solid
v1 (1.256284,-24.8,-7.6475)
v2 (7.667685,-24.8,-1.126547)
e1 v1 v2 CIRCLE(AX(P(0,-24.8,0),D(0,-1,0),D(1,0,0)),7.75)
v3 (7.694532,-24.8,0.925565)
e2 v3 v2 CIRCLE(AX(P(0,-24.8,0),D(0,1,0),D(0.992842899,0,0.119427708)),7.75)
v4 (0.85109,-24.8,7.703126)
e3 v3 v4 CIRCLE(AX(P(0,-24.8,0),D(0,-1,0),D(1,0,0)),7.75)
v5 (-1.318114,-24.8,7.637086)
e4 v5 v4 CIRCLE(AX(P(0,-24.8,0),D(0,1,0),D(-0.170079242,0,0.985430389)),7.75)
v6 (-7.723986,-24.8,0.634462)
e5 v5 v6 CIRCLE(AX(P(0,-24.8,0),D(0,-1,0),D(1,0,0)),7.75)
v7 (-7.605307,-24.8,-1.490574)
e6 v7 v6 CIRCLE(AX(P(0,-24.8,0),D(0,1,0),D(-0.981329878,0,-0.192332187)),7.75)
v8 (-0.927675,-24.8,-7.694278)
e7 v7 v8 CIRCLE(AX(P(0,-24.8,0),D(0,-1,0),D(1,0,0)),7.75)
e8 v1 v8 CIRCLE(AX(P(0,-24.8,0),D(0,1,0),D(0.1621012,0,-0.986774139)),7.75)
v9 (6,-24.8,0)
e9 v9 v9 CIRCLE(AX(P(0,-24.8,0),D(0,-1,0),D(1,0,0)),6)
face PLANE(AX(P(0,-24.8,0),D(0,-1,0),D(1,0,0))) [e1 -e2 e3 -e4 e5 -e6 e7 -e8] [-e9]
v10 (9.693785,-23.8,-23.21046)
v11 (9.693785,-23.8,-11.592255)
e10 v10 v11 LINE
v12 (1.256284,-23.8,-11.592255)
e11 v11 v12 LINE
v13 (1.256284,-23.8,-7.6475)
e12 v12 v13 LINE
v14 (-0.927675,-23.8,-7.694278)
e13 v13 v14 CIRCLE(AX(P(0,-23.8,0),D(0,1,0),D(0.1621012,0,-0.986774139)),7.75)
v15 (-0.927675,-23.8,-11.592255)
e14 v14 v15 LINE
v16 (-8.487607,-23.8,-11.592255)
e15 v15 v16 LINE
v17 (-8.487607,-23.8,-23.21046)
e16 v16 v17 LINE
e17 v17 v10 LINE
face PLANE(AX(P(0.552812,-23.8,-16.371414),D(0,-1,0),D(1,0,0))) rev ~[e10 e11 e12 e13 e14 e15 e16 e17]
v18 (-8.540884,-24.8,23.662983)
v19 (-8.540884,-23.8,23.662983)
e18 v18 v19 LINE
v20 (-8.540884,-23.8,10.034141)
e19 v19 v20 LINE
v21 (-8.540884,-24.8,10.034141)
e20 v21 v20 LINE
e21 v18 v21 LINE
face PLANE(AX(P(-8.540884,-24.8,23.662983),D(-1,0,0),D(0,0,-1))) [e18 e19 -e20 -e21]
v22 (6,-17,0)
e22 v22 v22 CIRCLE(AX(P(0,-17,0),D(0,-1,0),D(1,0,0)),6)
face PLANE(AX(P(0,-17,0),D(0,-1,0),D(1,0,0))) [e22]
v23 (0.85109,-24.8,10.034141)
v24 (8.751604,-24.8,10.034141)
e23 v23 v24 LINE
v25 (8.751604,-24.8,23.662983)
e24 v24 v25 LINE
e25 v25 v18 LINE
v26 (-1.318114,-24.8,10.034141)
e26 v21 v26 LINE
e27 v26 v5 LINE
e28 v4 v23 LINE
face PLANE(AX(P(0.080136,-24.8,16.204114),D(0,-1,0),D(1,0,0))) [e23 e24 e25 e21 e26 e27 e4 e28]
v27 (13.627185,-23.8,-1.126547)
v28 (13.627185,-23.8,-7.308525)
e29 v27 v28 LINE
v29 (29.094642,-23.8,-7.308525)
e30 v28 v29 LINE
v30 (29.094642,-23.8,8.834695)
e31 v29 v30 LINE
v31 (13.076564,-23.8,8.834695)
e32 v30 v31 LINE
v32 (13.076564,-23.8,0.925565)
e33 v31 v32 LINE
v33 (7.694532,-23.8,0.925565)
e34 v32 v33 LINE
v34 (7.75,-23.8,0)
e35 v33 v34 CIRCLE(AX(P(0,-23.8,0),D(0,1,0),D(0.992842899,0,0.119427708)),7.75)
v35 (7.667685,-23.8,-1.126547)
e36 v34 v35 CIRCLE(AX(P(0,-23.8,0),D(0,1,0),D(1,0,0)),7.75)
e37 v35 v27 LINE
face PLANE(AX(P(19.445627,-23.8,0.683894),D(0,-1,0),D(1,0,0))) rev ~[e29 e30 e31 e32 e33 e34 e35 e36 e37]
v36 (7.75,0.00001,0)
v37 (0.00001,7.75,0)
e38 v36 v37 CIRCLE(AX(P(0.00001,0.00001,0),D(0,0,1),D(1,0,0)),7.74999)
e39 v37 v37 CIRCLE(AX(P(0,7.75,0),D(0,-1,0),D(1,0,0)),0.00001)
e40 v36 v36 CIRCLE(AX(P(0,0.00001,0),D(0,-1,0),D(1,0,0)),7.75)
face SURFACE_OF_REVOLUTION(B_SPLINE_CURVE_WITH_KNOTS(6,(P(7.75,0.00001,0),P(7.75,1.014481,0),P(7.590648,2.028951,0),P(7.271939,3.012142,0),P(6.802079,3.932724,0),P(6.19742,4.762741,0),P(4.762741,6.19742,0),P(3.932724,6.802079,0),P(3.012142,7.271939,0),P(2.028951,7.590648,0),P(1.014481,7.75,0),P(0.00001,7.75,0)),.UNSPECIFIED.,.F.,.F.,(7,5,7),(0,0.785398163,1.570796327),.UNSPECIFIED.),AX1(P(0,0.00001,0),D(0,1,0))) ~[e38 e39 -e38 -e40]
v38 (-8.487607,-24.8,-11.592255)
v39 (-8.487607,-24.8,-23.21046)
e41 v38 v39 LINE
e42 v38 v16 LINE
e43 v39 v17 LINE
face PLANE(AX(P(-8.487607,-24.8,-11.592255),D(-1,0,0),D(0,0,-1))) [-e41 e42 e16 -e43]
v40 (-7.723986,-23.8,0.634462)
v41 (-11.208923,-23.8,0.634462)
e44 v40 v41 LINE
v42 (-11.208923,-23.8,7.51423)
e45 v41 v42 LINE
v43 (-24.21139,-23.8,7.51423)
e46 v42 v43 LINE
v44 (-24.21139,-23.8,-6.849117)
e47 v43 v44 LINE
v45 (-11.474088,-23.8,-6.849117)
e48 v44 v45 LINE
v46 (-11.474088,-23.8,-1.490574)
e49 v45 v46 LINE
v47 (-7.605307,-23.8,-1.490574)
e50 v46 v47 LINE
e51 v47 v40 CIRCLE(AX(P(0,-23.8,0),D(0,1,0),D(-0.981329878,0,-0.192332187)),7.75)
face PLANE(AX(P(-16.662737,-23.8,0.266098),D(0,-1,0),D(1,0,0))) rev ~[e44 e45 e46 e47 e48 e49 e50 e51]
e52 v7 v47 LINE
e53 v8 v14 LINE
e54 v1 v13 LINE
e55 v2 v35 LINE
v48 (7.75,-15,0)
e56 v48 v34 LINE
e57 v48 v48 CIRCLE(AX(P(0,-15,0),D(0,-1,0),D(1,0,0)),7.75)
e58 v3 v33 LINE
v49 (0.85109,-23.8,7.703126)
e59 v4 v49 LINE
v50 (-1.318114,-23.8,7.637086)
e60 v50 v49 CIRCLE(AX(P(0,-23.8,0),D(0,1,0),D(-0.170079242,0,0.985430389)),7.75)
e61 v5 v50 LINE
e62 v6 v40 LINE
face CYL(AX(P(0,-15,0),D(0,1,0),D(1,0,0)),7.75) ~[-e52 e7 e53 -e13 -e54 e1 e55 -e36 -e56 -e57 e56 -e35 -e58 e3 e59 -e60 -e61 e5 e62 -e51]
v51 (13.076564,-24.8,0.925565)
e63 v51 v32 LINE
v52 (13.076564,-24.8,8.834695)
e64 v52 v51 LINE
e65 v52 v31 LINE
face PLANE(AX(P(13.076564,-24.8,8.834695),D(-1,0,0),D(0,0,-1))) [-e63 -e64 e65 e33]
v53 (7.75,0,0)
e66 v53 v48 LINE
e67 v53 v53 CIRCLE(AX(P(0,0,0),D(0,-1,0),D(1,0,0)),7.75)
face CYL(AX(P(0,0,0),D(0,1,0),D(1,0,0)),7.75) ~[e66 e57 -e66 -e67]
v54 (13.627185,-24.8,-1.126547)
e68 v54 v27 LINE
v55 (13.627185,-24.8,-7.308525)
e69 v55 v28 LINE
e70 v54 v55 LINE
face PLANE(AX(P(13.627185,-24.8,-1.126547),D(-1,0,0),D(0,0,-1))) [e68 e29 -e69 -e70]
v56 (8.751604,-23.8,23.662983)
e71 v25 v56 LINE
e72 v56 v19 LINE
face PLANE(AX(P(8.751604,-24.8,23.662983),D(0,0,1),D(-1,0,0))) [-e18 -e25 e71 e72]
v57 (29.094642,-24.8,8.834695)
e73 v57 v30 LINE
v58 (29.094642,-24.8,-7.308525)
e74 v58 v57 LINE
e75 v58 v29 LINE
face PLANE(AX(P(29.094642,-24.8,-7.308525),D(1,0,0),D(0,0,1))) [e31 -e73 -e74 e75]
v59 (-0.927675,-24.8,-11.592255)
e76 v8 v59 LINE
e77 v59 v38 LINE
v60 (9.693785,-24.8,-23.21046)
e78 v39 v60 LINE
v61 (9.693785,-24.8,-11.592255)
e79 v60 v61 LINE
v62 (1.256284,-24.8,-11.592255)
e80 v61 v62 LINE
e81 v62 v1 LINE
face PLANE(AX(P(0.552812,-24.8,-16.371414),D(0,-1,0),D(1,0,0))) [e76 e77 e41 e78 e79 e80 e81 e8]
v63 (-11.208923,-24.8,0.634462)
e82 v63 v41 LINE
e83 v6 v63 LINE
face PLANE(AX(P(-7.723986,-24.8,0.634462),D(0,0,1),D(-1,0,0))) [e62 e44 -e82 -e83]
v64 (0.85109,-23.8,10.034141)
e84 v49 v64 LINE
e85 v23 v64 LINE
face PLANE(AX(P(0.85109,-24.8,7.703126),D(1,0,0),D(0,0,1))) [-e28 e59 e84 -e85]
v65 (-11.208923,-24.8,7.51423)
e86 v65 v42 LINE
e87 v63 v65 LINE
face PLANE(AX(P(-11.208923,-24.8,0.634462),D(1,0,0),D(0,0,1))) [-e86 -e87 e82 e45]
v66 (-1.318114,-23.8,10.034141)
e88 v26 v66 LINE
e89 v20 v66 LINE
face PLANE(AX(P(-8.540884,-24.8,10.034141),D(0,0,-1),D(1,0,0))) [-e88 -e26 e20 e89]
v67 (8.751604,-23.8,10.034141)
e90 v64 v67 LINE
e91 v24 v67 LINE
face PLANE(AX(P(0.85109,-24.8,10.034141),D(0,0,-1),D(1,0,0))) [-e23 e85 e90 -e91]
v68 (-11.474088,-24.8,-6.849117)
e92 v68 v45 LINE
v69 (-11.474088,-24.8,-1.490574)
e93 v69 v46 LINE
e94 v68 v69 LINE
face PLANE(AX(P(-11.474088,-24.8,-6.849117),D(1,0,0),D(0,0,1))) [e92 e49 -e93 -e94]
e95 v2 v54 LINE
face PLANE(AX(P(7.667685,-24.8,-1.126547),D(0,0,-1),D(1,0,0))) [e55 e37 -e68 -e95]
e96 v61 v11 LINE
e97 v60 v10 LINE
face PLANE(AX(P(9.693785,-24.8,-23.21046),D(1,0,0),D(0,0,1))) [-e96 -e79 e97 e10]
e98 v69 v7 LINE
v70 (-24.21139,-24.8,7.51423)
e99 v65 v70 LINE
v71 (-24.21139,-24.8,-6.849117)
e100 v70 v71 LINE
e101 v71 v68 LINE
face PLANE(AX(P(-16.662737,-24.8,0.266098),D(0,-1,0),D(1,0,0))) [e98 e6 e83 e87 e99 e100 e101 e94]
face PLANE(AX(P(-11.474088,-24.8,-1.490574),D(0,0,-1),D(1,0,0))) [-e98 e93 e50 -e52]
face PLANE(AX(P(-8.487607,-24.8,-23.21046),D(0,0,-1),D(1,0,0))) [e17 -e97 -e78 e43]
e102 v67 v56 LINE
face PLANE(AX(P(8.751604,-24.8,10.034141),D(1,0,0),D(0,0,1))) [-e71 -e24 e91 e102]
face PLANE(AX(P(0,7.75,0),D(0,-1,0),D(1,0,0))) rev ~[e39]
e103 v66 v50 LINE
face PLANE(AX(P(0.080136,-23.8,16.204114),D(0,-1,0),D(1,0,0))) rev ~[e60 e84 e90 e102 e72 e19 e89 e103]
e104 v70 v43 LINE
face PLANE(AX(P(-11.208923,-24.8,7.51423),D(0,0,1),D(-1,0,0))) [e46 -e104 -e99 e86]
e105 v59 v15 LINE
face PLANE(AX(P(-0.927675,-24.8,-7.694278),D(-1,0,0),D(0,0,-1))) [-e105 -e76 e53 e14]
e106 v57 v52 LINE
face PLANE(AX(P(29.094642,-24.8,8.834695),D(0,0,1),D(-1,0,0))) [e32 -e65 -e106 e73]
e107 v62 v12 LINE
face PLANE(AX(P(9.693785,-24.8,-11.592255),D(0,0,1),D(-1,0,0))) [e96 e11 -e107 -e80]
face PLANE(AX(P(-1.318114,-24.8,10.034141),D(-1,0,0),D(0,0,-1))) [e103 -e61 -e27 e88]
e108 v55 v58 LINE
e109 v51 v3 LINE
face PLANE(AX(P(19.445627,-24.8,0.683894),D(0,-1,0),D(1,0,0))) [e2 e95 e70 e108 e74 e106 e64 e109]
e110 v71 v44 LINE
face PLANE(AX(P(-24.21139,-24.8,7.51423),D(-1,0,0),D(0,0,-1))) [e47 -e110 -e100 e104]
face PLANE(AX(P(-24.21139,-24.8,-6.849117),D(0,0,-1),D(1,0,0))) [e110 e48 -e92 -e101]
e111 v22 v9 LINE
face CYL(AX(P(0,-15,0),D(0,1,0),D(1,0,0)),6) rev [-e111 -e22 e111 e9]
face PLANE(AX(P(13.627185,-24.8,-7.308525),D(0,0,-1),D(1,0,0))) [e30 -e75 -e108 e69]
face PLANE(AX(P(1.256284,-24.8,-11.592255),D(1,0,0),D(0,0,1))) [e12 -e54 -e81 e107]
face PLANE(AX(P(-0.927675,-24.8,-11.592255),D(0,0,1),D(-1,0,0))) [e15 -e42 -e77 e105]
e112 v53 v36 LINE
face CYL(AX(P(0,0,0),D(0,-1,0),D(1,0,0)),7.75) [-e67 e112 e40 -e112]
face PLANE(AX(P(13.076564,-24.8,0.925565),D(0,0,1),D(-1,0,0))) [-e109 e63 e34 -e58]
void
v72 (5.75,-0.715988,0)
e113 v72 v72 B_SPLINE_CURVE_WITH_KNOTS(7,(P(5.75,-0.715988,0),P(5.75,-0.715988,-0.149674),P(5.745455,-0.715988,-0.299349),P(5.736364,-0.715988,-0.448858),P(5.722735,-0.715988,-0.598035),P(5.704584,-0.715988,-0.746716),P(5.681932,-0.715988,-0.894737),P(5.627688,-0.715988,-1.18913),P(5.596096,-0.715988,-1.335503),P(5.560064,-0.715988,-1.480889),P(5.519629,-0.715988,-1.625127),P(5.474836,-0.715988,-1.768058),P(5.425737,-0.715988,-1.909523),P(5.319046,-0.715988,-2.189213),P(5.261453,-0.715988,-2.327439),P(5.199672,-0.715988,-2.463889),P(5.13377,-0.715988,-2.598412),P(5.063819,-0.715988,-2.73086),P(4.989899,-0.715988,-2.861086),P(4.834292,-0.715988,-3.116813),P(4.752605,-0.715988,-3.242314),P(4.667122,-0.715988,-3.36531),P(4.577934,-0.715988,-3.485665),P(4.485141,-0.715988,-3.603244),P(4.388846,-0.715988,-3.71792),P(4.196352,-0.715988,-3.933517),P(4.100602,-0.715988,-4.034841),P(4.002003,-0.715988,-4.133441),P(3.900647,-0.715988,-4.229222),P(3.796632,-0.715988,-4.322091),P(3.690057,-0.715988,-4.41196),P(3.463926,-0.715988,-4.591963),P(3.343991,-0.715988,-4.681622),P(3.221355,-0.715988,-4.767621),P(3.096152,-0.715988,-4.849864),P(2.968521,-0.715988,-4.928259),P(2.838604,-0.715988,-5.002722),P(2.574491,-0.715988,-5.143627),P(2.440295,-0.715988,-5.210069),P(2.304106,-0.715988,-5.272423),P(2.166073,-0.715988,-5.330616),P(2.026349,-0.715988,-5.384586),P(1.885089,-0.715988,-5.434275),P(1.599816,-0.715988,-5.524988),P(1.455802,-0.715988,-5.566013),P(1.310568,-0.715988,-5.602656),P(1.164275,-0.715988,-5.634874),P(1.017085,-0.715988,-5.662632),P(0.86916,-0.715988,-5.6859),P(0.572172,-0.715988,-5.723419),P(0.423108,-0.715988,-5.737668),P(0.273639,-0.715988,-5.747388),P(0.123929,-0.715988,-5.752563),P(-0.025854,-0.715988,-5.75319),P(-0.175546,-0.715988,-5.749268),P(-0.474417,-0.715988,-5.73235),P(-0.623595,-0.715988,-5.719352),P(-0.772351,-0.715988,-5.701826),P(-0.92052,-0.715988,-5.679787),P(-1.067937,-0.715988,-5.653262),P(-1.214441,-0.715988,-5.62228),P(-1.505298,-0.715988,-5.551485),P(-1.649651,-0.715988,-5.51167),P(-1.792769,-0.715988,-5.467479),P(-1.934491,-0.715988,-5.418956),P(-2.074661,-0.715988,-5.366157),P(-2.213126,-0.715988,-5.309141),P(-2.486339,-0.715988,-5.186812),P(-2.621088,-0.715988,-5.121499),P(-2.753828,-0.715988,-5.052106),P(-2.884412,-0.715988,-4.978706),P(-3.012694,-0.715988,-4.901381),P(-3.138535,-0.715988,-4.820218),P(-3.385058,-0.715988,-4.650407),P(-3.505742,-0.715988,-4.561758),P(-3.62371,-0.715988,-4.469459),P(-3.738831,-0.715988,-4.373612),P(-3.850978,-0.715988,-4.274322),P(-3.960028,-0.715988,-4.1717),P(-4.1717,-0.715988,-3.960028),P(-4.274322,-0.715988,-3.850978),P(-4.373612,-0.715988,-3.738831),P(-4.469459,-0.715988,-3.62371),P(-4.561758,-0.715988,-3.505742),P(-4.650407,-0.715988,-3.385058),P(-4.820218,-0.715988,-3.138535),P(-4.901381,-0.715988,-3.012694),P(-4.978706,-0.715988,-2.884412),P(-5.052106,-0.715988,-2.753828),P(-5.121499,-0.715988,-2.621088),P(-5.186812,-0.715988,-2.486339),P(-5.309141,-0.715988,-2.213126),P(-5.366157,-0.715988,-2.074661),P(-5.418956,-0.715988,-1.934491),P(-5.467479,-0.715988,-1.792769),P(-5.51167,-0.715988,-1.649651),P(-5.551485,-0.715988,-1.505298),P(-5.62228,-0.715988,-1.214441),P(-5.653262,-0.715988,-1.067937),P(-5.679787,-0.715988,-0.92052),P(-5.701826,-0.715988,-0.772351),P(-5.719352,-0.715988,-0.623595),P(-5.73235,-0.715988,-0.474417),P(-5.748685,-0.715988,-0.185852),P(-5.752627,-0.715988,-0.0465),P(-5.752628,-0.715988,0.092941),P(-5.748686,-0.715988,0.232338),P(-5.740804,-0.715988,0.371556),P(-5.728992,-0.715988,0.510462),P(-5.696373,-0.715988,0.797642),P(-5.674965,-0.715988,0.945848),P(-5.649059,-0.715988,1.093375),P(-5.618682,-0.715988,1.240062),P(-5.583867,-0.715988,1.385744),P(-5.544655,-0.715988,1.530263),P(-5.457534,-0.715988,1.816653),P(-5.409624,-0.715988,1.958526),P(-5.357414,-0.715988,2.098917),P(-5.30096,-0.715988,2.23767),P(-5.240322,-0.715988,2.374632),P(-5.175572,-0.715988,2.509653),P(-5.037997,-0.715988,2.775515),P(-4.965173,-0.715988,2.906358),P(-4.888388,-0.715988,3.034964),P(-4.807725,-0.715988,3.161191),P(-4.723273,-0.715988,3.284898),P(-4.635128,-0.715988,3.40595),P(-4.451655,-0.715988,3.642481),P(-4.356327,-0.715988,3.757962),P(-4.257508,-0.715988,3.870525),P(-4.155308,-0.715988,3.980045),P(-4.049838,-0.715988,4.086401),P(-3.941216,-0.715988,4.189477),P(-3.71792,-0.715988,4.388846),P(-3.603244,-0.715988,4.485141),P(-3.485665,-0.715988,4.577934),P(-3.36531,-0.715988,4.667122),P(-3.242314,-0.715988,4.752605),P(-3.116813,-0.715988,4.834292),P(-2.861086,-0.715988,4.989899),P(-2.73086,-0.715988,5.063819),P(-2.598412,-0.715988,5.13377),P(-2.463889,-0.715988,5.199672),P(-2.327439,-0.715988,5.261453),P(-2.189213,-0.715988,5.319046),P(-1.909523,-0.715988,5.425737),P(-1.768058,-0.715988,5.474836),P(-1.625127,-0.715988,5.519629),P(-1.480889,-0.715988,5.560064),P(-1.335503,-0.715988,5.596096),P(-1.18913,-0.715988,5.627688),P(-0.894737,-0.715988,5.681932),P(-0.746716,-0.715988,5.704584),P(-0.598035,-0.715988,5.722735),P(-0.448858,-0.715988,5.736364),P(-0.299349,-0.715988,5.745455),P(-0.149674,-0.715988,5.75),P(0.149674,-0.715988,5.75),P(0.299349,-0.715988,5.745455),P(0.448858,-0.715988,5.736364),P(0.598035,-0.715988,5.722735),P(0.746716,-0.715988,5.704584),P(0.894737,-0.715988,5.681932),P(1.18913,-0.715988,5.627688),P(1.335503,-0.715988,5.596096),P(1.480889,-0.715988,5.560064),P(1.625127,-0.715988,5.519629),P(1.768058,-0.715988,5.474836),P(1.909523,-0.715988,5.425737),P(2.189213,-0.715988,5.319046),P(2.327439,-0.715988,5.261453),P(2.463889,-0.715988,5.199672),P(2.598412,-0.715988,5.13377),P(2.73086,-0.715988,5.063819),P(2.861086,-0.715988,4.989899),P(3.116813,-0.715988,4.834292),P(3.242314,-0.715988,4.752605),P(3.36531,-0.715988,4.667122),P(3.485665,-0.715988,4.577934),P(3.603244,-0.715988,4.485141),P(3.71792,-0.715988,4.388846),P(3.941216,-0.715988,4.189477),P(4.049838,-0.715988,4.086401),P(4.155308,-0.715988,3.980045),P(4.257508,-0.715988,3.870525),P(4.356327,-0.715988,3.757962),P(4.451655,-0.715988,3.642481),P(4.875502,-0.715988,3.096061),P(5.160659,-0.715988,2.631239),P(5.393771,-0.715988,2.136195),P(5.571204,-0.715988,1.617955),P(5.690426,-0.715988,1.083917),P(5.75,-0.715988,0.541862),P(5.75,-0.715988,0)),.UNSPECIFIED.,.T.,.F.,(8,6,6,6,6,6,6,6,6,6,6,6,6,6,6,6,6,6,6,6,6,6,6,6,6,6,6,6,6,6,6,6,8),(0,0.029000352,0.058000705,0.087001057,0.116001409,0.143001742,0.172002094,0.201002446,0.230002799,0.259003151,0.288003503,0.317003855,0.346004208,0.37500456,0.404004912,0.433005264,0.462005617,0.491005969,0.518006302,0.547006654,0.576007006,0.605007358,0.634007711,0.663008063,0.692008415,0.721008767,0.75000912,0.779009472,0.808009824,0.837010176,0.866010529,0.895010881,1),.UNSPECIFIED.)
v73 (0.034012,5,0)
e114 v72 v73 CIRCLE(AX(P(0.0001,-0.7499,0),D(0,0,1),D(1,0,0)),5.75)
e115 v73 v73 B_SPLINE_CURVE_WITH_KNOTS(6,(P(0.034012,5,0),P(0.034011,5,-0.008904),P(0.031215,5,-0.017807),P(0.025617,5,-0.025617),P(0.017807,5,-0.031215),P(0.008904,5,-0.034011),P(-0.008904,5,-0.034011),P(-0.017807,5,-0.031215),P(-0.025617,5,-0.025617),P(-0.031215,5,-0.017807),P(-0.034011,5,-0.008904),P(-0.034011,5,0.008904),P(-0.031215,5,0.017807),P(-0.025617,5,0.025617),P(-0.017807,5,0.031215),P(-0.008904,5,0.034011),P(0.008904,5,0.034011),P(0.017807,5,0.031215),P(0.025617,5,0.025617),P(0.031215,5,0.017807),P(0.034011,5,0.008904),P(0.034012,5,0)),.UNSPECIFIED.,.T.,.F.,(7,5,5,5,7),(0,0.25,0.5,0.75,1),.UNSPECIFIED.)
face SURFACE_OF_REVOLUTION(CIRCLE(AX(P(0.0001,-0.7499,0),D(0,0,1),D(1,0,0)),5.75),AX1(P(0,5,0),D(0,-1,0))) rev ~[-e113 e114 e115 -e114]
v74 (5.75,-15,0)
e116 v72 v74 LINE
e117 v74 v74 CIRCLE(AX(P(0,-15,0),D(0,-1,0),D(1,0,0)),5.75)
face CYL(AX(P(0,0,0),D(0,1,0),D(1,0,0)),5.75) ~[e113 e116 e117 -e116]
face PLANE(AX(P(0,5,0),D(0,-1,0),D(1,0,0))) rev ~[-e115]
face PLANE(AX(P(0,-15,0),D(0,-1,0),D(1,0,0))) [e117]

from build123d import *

# Parameters (mm, degrees)
F0_R      = 7.75
F0_R_2    = 5.75
F1_DEPTH  = 7.75
F2_R      = 7.74999
F3_DEPTH  = 15
F4_DEPTH  = 5
F6_R      = 7.75
F6_R_2    = 6
F7_DEPTH  = 9.8
F6_R_3    = 5.75
F8_DEPTH  = 2
F10_DEPTH = 1


# Not quite as in the source:
# - a fillet or chamfer that OpenCascade refuses, or shapes differently, is made with other operations: its cross-section is extruded or revolved along the edge and cut away or added
# - a fillet or chamfer is up to 0.001 mm smaller than in the source, because OpenCascade refuses the exact size


with BuildPart() as f1:
    # F0 (on Front) → F1 (new body)
    with BuildSketch(Plane.XZ):
        Circle(F0_R)
        Circle(F0_R_2, mode=Mode.SUBTRACT)
        Circle(F0_R_2)
    extrude(amount=-F1_DEPTH)

    # F2 (radius 7.75 in the source; OpenCascade refuses exactly that, so slightly less here)
    f2_edges = [f1.edges().sort_by_distance(p)[0] for p in [
        (-7.75, 7.75, 0),
    ]]
    fillet(f2_edges, radius=F2_R)

    # F0 (on Front) → F3 (join)
    with BuildSketch(Plane.XZ):
        Circle(F0_R)
        Circle(F0_R_2, mode=Mode.SUBTRACT)
    extrude(amount=F3_DEPTH)

    # F0 (on Front) → F4 (cut)
    with BuildSketch(Plane.XZ):
        Circle(F0_R_2)
    extrude(amount=-F4_DEPTH, mode=Mode.SUBTRACT)

    # F5: fillet of radius 5.75 on 1 edges, made by hand

    # F5_s1 → F5_t2 (revolve)
    with BuildSketch(Plane.XY):
        with BuildLine():
            ThreePointArc((5.7501, -0.7499), (4.0659639918, 3.3159639918), (0.0001, 5.0001))
            Line((0.0001, 5.0001), (0.0001, 5.1151))
            ThreePointArc((0.0001, 5.1151), (2.87505, 5.115), (5.75, 5.115))
            Line((5.75, 5.115), (5.865, 5))
            ThreePointArc((5.865, 5), (5.865, 2.12505), (5.8651, -0.7499))
            Line((5.8651, -0.7499), (5.7501, -0.7499))
        make_face()
    revolve(axis=Axis((0, 5, 0), (0, -1, 0)))

    # F6 (on face) → F7 (join)
    with BuildSketch(Plane.XZ.offset(15)):
        Circle(F6_R)
        Circle(F6_R_2, mode=Mode.SUBTRACT)
    extrude(amount=F7_DEPTH)

    # F6 (on face) → F8 (join)
    with BuildSketch(Plane.XZ.offset(15)):
        Circle(F6_R_2)
        Circle(F6_R_3, mode=Mode.SUBTRACT)
        Circle(F6_R_3)
    extrude(amount=F8_DEPTH)

    # F9 (on face) → F10 (join)
    with BuildSketch(Plane.XZ.offset(24.8)):
        with BuildLine():
            ThreePointArc((-7.6053065566, -1.4905744465), (-7.7379420075, -0.4321498454), (-7.7239859171, 0.6344616239))
            Line((-7.7239859171, 0.6344616239), (-11.2089226057, 0.6344616239))
            Line((-11.2089226057, 0.6344616239), (-11.2089226057, 7.51422951))
            Line((-11.2089226057, 7.51422951), (-24.211389944, 7.51422951))
            Line((-24.211389944, 7.51422951), (-24.211389944, -6.8491166458))
            Line((-24.211389944, -6.8491166458), (-11.4740878344, -6.8491166458))
            Line((-11.4740878344, -6.8491166458), (-11.4740878344, -1.4905744465))
            Line((-11.4740878344, -1.4905744465), (-7.6053065566, -1.4905744465))
        make_face()
        with BuildLine():
            ThreePointArc((-1.3181141258, 7.6370855142), (-0.2358353441, 7.7464108909), (0.8510895829, 7.7031257631))
            Line((0.8510895829, 7.7031257631), (0.8510895829, 10.0341412146))
            Line((0.8510895829, 10.0341412146), (8.7516037747, 10.0341412146))
            Line((8.7516037747, 10.0341412146), (8.7516037747, 23.6629825085))
            Line((8.7516037747, 23.6629825085), (-8.5408838931, 23.6629825085))
            Line((-8.5408838931, 23.6629825085), (-8.5408838931, 10.2677652612))
            Line((-8.5408838931, 10.2677652612), (-8.5408838931, 10.0341412146))
            Line((-8.5408838931, 10.0341412146), (-1.3181141258, 10.0341412146))
            Line((-1.3181141258, 10.0341412146), (-1.3181141258, 7.6370855142))
        make_face()
        with BuildLine():
            Line((13.07656436, 0.9255647358), (7.6945324692, 0.9255647358))
            ThreePointArc((7.6945324692, 0.9255647358), (7.7361206892, 0.463612642), (7.75, 0))
            ThreePointArc((7.75, 0), (7.7293938157, -0.5647753903), (7.6676848409, -1.1265474604))
            Line((7.6676848409, -1.1265474604), (13.6271854863, -1.1265474604))
            Line((13.6271854863, -1.1265474604), (13.6271854863, -7.3085245676))
            Line((13.6271854863, -7.3085245676), (29.0946420282, -7.3085245676))
            Line((29.0946420282, -7.3085245676), (29.0946420282, 8.8346945122))
            Line((29.0946420282, 8.8346945122), (13.07656436, 8.8346945122))
            Line((13.07656436, 8.8346945122), (13.07656436, 0.9255647358))
        make_face()
        with BuildLine():
            Line((1.256284304, -11.5922550619), (1.256284304, -7.6474995749))
            ThreePointArc((1.256284304, -7.6474995749), (0.1659608629, -7.748222828), (-0.9276754413, -7.6942782817))
            Line((-0.9276754413, -7.6942782817), (-0.9276754413, -11.5922550619))
            Line((-0.9276754413, -11.5922550619), (-8.4876073524, -11.5922550619))
            Line((-8.4876073524, -11.5922550619), (-8.4876073524, -23.2104603201))
            Line((-8.4876073524, -23.2104603201), (9.6937846392, -23.2104603201))
            Line((9.6937846392, -23.2104603201), (9.6937846392, -11.5922550619))
            Line((9.6937846392, -11.5922550619), (1.256284304, -11.5922550619))
        make_face()
    extrude(amount=-F10_DEPTH)


solid = f1.part
